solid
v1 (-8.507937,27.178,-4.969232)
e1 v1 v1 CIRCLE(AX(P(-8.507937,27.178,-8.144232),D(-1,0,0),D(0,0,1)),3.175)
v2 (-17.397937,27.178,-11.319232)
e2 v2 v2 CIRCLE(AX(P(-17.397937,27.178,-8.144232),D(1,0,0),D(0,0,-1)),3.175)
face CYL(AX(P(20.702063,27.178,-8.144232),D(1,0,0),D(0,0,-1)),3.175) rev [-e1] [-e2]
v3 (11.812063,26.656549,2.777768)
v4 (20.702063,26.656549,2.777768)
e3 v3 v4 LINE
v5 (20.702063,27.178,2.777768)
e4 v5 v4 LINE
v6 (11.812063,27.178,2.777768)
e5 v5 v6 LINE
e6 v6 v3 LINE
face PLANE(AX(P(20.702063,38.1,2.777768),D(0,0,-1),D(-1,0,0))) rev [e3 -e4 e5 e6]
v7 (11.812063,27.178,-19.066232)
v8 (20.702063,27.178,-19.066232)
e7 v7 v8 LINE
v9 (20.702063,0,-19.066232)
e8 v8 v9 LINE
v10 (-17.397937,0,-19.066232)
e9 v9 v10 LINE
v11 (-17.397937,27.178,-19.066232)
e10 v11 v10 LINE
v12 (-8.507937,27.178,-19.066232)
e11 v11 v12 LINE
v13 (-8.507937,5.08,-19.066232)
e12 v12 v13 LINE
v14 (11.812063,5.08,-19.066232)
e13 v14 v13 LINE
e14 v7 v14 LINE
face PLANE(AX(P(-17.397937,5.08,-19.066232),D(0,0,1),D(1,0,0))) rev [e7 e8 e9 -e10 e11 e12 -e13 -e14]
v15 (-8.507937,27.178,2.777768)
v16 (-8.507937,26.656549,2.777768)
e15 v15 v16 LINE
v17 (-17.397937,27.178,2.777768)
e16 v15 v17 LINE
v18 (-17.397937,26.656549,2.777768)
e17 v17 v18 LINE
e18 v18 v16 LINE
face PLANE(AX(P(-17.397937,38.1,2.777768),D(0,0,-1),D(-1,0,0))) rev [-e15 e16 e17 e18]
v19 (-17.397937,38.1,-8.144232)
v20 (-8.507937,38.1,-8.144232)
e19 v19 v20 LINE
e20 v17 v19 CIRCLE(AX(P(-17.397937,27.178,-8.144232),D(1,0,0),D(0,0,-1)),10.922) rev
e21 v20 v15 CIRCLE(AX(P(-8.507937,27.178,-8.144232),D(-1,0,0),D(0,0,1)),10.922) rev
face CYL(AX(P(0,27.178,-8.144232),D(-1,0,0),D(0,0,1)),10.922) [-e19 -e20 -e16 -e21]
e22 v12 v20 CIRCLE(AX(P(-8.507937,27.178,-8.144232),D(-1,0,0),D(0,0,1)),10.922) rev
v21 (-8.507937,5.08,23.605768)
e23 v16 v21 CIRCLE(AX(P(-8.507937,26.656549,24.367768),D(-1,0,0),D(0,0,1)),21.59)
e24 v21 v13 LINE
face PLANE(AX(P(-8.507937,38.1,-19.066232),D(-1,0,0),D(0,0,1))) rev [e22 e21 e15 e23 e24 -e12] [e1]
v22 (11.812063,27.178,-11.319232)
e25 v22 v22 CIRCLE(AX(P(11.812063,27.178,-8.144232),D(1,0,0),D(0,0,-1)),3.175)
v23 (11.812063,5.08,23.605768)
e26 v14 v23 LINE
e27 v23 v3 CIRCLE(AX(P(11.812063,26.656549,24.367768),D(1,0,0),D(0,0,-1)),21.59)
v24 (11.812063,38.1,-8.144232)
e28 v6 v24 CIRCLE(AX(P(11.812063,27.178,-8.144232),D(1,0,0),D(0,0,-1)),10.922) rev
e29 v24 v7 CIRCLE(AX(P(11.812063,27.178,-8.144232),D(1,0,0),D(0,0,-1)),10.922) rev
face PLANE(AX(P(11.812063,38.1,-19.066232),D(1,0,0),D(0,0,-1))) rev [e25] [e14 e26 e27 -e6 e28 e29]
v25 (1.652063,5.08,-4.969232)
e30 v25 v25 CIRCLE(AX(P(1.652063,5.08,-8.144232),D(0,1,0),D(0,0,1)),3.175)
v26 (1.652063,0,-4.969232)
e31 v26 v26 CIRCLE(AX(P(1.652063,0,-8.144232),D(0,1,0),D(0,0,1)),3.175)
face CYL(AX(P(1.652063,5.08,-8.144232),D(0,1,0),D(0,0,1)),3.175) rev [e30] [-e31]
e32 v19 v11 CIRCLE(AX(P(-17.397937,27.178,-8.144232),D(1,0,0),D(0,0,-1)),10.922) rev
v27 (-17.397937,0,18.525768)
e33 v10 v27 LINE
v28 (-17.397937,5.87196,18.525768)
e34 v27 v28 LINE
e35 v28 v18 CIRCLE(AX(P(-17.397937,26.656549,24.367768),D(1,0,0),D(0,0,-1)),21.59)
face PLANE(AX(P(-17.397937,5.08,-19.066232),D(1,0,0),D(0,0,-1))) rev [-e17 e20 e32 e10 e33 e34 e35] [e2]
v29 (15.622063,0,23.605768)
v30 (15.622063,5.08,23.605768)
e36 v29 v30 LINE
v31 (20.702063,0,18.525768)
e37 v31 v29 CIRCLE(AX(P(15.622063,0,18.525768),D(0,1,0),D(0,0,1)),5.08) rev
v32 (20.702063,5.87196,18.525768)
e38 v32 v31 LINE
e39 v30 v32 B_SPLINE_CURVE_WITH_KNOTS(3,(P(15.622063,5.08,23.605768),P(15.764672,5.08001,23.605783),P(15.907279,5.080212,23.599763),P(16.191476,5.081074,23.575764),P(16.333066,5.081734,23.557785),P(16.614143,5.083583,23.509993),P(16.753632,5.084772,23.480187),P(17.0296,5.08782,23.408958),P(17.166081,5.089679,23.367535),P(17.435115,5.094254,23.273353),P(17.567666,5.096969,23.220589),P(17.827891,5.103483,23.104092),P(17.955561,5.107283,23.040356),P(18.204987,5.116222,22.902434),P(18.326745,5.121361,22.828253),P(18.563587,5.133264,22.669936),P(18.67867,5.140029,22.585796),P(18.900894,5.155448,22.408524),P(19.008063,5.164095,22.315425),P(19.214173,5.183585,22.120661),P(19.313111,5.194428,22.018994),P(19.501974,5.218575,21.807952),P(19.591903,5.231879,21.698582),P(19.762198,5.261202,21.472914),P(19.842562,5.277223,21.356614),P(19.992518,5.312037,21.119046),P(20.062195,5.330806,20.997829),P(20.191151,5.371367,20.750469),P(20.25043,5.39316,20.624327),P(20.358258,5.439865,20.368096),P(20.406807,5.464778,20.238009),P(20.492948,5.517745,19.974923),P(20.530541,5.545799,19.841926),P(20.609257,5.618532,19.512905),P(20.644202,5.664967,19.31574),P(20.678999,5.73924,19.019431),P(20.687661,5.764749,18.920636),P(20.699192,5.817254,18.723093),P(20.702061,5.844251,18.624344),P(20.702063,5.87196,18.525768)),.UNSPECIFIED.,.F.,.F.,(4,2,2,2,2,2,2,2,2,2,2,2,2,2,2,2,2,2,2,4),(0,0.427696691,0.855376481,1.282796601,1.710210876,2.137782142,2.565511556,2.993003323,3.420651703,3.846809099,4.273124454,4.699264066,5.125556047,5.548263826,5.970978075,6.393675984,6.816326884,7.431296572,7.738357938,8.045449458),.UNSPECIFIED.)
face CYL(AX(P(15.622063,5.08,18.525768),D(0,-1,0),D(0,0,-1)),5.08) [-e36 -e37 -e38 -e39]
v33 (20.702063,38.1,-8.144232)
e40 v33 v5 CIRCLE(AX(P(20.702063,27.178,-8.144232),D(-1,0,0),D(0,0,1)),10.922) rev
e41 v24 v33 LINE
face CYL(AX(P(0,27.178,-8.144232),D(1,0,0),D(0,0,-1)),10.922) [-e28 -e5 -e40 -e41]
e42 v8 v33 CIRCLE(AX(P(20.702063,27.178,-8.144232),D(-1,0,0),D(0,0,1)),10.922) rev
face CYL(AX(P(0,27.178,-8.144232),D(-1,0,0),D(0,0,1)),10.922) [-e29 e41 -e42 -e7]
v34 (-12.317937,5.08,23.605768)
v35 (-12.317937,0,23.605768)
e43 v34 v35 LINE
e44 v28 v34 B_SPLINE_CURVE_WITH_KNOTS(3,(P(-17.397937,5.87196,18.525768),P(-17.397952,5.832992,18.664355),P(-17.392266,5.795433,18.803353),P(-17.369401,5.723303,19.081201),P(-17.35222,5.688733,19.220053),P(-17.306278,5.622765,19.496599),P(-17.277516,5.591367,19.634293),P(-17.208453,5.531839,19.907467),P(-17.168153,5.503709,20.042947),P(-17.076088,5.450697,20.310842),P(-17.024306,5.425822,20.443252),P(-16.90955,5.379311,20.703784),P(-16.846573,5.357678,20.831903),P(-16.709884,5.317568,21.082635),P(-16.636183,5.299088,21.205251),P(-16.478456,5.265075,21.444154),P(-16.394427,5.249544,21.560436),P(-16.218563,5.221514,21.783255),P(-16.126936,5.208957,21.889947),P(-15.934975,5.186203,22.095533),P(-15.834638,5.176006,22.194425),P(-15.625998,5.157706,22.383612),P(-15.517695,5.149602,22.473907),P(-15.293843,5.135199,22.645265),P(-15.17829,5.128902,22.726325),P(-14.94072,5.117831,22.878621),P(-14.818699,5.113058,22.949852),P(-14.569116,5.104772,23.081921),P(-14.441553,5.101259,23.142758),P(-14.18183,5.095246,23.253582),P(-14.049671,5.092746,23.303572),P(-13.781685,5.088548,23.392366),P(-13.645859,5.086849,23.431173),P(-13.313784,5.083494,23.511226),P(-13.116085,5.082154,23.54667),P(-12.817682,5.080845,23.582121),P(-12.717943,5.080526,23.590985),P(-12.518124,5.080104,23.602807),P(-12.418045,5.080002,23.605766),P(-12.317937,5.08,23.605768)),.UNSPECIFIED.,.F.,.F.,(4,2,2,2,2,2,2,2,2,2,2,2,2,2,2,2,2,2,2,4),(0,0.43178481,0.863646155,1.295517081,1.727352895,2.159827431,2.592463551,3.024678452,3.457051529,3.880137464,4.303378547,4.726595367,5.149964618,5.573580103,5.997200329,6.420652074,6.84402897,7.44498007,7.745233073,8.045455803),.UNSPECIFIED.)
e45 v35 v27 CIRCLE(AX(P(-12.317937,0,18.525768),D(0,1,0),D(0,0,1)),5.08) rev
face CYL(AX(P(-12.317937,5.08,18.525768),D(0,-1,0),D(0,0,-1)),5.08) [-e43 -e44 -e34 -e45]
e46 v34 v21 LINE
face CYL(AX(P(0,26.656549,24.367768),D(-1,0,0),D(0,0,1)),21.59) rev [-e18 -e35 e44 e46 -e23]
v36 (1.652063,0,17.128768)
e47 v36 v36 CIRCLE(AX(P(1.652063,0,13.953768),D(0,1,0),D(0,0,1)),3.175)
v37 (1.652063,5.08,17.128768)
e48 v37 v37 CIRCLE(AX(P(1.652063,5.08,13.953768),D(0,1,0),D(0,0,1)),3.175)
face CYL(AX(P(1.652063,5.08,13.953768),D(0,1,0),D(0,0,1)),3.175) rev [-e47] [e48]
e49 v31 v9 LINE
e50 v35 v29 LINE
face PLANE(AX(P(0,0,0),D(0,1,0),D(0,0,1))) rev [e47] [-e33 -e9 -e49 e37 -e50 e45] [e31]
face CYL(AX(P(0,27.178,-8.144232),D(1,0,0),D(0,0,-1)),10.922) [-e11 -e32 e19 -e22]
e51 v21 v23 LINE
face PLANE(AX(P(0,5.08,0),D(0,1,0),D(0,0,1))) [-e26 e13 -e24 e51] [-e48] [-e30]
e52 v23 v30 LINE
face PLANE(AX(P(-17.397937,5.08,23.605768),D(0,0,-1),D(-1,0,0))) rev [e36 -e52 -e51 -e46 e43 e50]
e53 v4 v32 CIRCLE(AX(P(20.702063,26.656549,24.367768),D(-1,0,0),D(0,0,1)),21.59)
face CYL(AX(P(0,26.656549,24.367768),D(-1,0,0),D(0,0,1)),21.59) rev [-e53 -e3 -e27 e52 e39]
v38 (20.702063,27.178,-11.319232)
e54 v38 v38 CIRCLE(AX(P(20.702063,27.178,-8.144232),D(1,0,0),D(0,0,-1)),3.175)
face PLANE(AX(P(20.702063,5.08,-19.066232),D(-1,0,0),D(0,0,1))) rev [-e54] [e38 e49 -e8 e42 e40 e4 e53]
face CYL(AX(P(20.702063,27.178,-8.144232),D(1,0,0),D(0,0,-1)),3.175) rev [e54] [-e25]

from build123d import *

# Parameters (mm, degrees)
SKETCH1_W                            = 38.1
SKETCH1_H                            = 42.672
BOSS_EXTRUDE1_DEPTH                  = 5.08
SKETCH2_W                            = 8.89
SKETCH2_H                            = 21.844
BOSS_EXTRUDE2_DEPTH                  = 33.02
FILLET1_R                            = 10.922
FILLET2_R                            = 21.59
FILLET3_R                            = 5.08
F_1_1_DIAMETER_HOLE1_D               = 6.35
F_1_1_DIAMETER_HOLE1_DEPTH           = 50.8
F_1_1_DIAMETER_HOLE1_TIP             = 1.907732465
F_1_1_DIAMETER_HOLE1_ON_FACE_2_D     = 6.35
F_1_1_DIAMETER_HOLE1_ON_FACE_2_DEPTH = 50.8
F_1_1_DIAMETER_HOLE1_ON_FACE_2_TIP   = 1.907732465


# Some blends are built 0.0001 mm under size
with BuildPart() as part:
    # Sketch1 → Boss-Extrude1 (new body)
    with BuildSketch(Plane(origin=(0, 0, 0), x_dir=(1, 0, 0), z_dir=(0, 1, 0))):
        with Locations((1.652063174, -2.269767862)):
            Rectangle(SKETCH1_W, SKETCH1_H)
    extrude(amount=BOSS_EXTRUDE1_DEPTH)

    # Sketch2 → Boss-Extrude2 (add)
    with BuildSketch(Plane(origin=(0, 5.08, 0), x_dir=(1, 0, 0), z_dir=(0, 1, 0))):
        with Locations((16.257063174, 8.144232138)):
            Rectangle(SKETCH2_W, SKETCH2_H)
        with Locations((-12.952936826, 8.144232138)):
            Rectangle(SKETCH2_W, SKETCH2_H)
    extrude(amount=BOSS_EXTRUDE2_DEPTH)

    # Fillet1
    fillet1_edges = [part.edges().sort_by_distance(p)[0] for p in [
        (-12.952936826, 38.1, -19.066232138),
        (16.257063174, 38.1, -19.066232138),
        (16.257063174, 38.1, 2.777767862),
        (-12.952936826, 38.1, 2.777767862),
    ]]
    fillet(fillet1_edges, radius=FILLET1_R - 0.0001)  # a hair under: the kernel refuses the full size

    # Fillet2
    # the kernel refuses this fillet: 21.59 mm, written as the material it adds along each edge
    with BuildSketch(Plane(origin=(-42.129308703, 5.08, 2.777767862), x_dir=(0, 0, 1), z_dir=(1, 0, 0))) as fillet2_piece_1_section:
        with BuildLine():
            CenterArc((21.59, -21.576548751), FILLET2_R, 92.022624053, 87.977375947)
            Line((0, -21.576548751), (-0.4318, -21.576548751))
            Line((-0.4318, -21.576548751), (-0.4318, 0))
            Line((-0.4318, 0), (0, 0.4318))
            ThreePointArc((0, 0.4318), (10.414, 0.4318), (20.81276, 0.431530975))
            Line((20.81276, 0.431530975), (20.828, 0))
        make_face()
    fillet2_piece_1 = extrude(amount=62.831371877, mode=Mode.PRIVATE)
    fillet2_piece_1 = split(fillet2_piece_1, bisect_by=Plane(origin=(-17.397936826, 9.985892861, 7.610379984), z_dir=(1, 0, 0)), keep=Keep.TOP, mode=Mode.PRIVATE)
    fillet2_piece_1 = split(fillet2_piece_1, bisect_by=Plane(origin=(-8.507936826, 9.985892861, 7.610379984), z_dir=(-1, 0, 0)), keep=Keep.TOP, mode=Mode.PRIVATE)
    add(fillet2_piece_1)
    with BuildSketch(Plane(origin=(11.812063174, 5.08, 2.777767862), x_dir=(0, 0, 1), z_dir=(1, 0, 0))) as fillet2_piece_2:
        with BuildLine():
            CenterArc((21.59, -21.576548751), FILLET2_R, 92.022624053, 87.977375947)
            Line((0, -21.576548751), (-0.4318, -21.576548751))
            Line((-0.4318, -21.576548751), (-0.4318, 0))
            Line((-0.4318, 0), (0, 0.4318))
            ThreePointArc((0, 0.4318), (10.414, 0.4318), (20.81276, 0.431530975))
            Line((20.81276, 0.431530975), (20.828, 0))
        make_face()
    extrude(amount=8.89)
    with BuildSketch(Plane(origin=(45.433435051, 5.08, 2.777767862), x_dir=(0, 0, 1), z_dir=(-1, 0, 0))) as fillet2_piece_3_section:
        with BuildLine():
            CenterArc((21.59, 21.576548751), FILLET2_R, 180, 87.977375947)
            Line((0, 21.576548751), (-0.4318, 21.576548751))
            Line((-0.4318, 21.576548751), (-0.4318, 0))
            Line((-0.4318, 0), (0, -0.4318))
            ThreePointArc((0, -0.4318), (10.414, -0.4318), (20.81276, -0.431530975))
            Line((20.81276, -0.431530975), (20.828, 0))
        make_face()
    fillet2_piece_3 = extrude(amount=62.831371877, mode=Mode.PRIVATE)
    fillet2_piece_3 = split(fillet2_piece_3, bisect_by=Plane(origin=(20.702063174, 9.985892861, 7.610379984), z_dir=(-1, 0, 0)), keep=Keep.TOP, mode=Mode.PRIVATE)
    fillet2_piece_3 = split(fillet2_piece_3, bisect_by=Plane(origin=(11.812063174, 9.985892861, 7.610379984), z_dir=(1, 0, 0)), keep=Keep.TOP, mode=Mode.PRIVATE)
    add(fillet2_piece_3)
    with BuildSketch(Plane(origin=(-8.507936826, 5.08, 2.777767862), x_dir=(0, 0, 1), z_dir=(-1, 0, 0))) as fillet2_piece_4:
        with BuildLine():
            CenterArc((21.59, 21.576548751), FILLET2_R, 180, 87.977375947)
            Line((0, 21.576548751), (-0.4318, 21.576548751))
            Line((-0.4318, 21.576548751), (-0.4318, 0))
            Line((-0.4318, 0), (0, -0.4318))
            ThreePointArc((0, -0.4318), (10.414, -0.4318), (20.81276, -0.431530975))
            Line((20.81276, -0.431530975), (20.828, 0))
        make_face()
    extrude(amount=8.89)

    # Fillet3
    fillet3_edges = [part.edges().sort_by_distance(p)[0] for p in [
        (20.702063174, 2.54, 23.605767862),
        (-17.397936826, 2.54, 23.605767862),
    ]]
    fillet(fillet3_edges, radius=FILLET3_R)

    # 1 (1) Diameter Hole1
    with Locations(Plane(origin=(1.652063174, 5.08, 13.953767862), x_dir=(0, 0, 1), z_dir=(0, 1, 0))):
        with Locations((0, 0), (-22.098, 0)):
            Hole(F_1_1_DIAMETER_HOLE1_D / 2, depth=F_1_1_DIAMETER_HOLE1_DEPTH)
            with Locations((0, 0, -(F_1_1_DIAMETER_HOLE1_DEPTH + F_1_1_DIAMETER_HOLE1_TIP / 2))):  # 118° drill point
                Cone(0, F_1_1_DIAMETER_HOLE1_D / 2, F_1_1_DIAMETER_HOLE1_TIP, mode=Mode.SUBTRACT)

    # 1 (1) Diameter Hole1 on face 2
    with Locations(Plane(origin=(20.702063174, 27.178, -8.144232138), x_dir=(0, 0, 1), z_dir=(1, 0, 0))):
        with Locations((0, 0)):
            Hole(F_1_1_DIAMETER_HOLE1_ON_FACE_2_D / 2, depth=F_1_1_DIAMETER_HOLE1_ON_FACE_2_DEPTH)
            with Locations((0, 0, -(F_1_1_DIAMETER_HOLE1_ON_FACE_2_DEPTH + F_1_1_DIAMETER_HOLE1_ON_FACE_2_TIP / 2))):  # 118° drill point
                Cone(0, F_1_1_DIAMETER_HOLE1_ON_FACE_2_D / 2, F_1_1_DIAMETER_HOLE1_ON_FACE_2_TIP, mode=Mode.SUBTRACT)


solid = part.part
